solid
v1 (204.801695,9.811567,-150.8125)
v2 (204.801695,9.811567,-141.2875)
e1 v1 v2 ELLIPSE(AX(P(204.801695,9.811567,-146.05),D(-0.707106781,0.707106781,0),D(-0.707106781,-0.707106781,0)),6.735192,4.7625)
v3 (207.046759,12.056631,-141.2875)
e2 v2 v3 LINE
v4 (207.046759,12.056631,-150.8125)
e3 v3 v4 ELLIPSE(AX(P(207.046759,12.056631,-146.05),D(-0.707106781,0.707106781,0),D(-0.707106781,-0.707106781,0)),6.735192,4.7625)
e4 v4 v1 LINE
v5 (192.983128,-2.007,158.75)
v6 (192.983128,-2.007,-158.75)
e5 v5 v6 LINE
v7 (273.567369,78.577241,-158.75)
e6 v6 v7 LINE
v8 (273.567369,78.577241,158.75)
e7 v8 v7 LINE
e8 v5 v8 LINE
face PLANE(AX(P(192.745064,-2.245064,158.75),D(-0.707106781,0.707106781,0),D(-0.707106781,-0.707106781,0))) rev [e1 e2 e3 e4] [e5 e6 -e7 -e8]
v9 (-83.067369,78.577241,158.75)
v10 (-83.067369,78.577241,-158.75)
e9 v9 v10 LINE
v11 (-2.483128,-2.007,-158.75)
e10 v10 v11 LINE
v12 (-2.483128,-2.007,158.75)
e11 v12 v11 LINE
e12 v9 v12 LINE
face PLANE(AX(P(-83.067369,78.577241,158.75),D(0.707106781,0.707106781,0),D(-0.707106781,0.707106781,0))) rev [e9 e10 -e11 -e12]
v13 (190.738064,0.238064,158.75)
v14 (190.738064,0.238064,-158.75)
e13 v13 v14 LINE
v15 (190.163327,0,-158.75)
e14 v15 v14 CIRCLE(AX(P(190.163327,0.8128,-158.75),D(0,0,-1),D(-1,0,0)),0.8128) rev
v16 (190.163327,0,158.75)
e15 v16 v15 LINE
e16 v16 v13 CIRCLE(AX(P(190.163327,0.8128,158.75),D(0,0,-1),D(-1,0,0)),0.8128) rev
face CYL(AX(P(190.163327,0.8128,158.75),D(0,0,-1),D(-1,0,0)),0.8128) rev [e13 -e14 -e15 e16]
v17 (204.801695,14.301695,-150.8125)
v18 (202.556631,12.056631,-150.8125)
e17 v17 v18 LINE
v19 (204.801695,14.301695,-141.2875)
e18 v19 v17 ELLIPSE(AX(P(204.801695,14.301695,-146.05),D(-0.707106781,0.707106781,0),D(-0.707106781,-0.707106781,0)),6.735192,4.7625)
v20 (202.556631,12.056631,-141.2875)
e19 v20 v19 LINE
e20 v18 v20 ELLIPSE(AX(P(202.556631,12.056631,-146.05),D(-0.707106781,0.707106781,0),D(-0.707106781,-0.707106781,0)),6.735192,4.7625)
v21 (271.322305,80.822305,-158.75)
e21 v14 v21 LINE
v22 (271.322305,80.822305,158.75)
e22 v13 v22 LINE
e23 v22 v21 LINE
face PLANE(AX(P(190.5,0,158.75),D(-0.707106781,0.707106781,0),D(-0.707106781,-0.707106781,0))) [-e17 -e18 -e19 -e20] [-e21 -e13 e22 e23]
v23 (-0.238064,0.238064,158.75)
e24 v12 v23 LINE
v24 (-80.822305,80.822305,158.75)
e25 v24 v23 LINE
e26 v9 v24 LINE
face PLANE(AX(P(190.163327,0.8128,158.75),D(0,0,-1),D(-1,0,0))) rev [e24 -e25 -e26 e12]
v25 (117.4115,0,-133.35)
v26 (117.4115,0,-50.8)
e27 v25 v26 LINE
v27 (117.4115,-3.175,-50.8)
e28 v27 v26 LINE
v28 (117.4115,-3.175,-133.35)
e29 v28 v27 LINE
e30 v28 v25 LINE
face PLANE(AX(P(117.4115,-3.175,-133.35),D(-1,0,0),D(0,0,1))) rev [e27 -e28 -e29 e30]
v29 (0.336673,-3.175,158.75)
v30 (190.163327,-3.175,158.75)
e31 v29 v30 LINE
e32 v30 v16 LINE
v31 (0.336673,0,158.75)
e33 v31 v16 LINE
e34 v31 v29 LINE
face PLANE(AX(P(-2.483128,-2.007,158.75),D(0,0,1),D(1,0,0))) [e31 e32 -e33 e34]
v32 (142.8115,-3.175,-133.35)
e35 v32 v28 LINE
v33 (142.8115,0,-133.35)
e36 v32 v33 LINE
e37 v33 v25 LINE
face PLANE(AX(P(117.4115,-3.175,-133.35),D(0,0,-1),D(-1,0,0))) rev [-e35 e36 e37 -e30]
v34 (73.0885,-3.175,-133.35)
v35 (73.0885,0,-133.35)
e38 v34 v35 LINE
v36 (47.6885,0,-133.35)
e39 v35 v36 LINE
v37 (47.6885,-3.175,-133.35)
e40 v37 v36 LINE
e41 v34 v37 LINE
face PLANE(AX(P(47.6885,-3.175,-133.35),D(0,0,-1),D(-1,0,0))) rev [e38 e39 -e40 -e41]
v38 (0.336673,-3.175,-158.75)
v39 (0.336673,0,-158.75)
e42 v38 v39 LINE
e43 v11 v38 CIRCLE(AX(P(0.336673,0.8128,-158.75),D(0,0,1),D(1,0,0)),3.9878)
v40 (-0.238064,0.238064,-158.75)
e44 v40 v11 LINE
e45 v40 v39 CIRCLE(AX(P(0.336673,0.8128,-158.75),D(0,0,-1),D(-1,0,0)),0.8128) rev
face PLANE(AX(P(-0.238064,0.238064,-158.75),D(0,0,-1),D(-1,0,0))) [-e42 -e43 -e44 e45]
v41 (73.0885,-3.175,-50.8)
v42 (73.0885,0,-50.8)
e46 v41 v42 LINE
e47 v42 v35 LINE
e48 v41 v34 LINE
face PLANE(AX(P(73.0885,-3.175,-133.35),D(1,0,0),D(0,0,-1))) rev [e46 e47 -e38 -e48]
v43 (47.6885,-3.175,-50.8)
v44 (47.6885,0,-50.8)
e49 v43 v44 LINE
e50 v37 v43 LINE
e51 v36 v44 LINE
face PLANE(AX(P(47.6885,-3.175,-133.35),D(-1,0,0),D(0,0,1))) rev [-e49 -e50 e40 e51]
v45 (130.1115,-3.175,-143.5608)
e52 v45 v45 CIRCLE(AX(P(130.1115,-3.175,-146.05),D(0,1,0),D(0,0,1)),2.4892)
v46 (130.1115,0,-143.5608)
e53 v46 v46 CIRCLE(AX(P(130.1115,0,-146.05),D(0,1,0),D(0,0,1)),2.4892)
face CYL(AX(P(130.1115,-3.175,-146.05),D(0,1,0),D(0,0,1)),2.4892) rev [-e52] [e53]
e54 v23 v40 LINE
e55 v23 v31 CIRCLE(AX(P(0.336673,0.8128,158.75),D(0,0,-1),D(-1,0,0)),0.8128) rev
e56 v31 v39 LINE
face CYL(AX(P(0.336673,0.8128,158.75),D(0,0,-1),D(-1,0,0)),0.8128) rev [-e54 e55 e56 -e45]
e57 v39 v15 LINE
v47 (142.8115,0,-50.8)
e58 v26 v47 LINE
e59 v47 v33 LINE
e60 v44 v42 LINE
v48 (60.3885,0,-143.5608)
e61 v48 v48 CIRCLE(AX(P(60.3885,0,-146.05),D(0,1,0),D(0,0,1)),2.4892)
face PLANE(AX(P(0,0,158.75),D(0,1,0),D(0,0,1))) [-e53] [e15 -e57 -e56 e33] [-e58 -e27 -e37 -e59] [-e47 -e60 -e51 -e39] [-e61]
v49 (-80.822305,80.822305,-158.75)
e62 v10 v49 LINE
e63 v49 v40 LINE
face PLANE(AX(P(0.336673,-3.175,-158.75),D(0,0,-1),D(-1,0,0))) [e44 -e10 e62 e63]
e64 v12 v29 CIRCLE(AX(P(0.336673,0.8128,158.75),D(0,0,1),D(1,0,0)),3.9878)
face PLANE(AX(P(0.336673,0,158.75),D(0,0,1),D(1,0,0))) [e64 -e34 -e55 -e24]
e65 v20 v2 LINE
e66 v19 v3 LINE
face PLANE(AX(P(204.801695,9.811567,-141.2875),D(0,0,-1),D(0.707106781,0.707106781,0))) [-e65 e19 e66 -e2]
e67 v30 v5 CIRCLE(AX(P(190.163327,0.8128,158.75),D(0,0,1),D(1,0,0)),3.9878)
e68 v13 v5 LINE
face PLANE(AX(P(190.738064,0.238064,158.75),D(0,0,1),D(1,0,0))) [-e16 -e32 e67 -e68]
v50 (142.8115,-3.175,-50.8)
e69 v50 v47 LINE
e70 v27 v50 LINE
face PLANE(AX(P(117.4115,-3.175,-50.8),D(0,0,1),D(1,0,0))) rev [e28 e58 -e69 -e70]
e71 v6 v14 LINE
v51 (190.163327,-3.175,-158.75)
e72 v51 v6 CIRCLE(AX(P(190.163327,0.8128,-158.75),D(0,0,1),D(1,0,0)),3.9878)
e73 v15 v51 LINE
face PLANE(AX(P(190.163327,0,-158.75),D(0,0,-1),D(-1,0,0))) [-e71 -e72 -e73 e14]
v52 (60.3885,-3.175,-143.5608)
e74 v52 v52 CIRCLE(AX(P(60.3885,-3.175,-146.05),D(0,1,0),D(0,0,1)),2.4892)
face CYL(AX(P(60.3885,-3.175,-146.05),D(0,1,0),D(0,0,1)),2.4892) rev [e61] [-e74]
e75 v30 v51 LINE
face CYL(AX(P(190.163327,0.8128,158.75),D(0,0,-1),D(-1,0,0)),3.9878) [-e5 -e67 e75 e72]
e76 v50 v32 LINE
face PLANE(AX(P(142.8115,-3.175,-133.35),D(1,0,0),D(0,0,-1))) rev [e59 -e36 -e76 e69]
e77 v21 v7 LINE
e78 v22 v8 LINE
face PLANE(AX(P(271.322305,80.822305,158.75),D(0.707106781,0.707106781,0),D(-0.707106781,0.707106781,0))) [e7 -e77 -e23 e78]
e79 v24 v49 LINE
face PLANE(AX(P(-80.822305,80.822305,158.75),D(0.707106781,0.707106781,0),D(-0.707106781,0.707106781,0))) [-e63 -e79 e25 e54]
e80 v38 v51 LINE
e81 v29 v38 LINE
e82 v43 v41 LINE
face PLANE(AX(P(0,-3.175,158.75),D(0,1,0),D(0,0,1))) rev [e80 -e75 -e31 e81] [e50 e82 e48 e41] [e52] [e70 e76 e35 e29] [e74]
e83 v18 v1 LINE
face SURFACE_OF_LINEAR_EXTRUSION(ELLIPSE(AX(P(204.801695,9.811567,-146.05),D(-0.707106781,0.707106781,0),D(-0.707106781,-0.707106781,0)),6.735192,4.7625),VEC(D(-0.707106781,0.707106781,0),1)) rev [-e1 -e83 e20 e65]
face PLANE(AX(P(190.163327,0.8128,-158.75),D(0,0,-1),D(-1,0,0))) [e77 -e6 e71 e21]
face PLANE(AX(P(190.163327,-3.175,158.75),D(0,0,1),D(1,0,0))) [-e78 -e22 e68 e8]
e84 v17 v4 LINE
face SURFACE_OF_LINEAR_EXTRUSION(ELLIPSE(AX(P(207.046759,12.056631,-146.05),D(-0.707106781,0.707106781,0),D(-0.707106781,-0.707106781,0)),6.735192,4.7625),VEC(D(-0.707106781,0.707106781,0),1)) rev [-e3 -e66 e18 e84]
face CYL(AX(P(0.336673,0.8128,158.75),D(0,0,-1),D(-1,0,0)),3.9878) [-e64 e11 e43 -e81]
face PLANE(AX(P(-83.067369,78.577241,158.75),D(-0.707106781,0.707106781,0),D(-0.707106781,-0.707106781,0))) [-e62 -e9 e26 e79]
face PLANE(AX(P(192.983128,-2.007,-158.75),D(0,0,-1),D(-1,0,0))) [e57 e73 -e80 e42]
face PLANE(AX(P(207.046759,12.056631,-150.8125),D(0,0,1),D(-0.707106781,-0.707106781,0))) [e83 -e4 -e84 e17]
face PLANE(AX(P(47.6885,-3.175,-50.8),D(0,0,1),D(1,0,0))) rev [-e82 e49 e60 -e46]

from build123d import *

# Parameters (mm, degrees)
BASE_FLANGE1_DEPTH = 158.75
SKETCH8_R          = 2.4892
SKETCH8_W          = 25.4
SKETCH8_H          = 82.55
CUT_EXTRUDE1_DEPTH = 327.455070335
CUT_EXTRUDE3_START = 134.703841816
CUT_EXTRUDE3_DEPTH = 3.175


# Read off the part's stored shape, not the designer's step: Cut-Extrude3
# Sheet-metal steps are written as plain solids
with BuildPart() as part:
    # Sketch1 → Base-Flange1 (new, symmetric)
    with BuildSketch(Plane.XY):
        with BuildLine():
            Line((-80.82230509, 80.82230509), (-0.238063608, 0.238063608))
            ThreePointArc((-0.238063608, 0.238063608), (0.02562769, 0.061870716), (0.336672783, 0))
            Line((0.336672783, 0), (190.163327217, 0))
            ThreePointArc((190.163327217, 0), (190.47437231, 0.061870716), (190.738063608, 0.238063608))
            Line((190.738063608, 0.238063608), (271.32230509, 80.82230509))
            Line((271.32230509, 80.82230509), (273.56736912, 78.577241059))
            Line((273.56736912, 78.577241059), (192.983127639, -2.007000422))
            ThreePointArc((192.983127639, -2.007000422), (191.689392208, -2.8714468), (190.163327217, -3.175))
            Line((190.163327217, -3.175), (0.336672783, -3.175))
            ThreePointArc((0.336672783, -3.175), (-1.189392208, -2.8714468), (-2.483127639, -2.007000422))
            Line((-2.483127639, -2.007000422), (-83.06736912, 78.577241059))
            Line((-83.06736912, 78.577241059), (-80.82230509, 80.82230509))
        make_face()
    extrude(amount=BASE_FLANGE1_DEPTH, both=True)

    # Sketch8 → Cut-Extrude1 (cut, through all)
    with BuildSketch(Plane(origin=(0, 0, 0), x_dir=(1, 0, 0), z_dir=(0, 1, 0))):
        with Locations(Location((60.3885, 146.05, 0), (0, 0, 270))):
            Circle(SKETCH8_R)
        with Locations(Location((130.1115, 146.05, 0), (0, 0, 270))):
            Circle(SKETCH8_R)
        with Locations((60.3885, 92.075)):
            Rectangle(SKETCH8_W, SKETCH8_H)
        with Locations((130.1115, 92.075)):
            Rectangle(SKETCH8_W, SKETCH8_H)
    extrude(amount=-CUT_EXTRUDE1_DEPTH, mode=Mode.SUBTRACT)

    # Cut-Extrude3 outline → Cut-Extrude3 (cut)
    with BuildSketch(Plane(origin=(0, 0, 0), x_dir=(0.7071067811865472, 0.7071067811865479, 0), z_dir=(0.7071067811865479, -0.707106781186547, 0)).offset(CUT_EXTRUDE3_START)):
        with BuildLine():
            add(Edge.make_bspline(
                [(151.754493433, -150.8125), (145.019301342, -150.8125), (145.019301342, -146.05), (145.019301342, -141.2875), (151.754493433, -141.2875)],
                knots=[4.71238898, 4.71238898, 4.71238898, 6.283185307, 6.283185307, 7.853981634, 7.853981634, 7.853981634], degree=2, weights=[1, 0.707106781, 1, 0.707106781, 1]))
            Line((151.754493433, -150.8125), (154.929493433, -150.8125))
            add(Edge.make_bspline(
                [(154.929493433, -141.2875), (161.664685524, -141.2875), (161.664685524, -146.05), (161.664685524, -150.8125), (154.929493433, -150.8125)],
                knots=[1.570796327, 1.570796327, 1.570796327, 3.141592654, 3.141592654, 4.71238898, 4.71238898, 4.71238898], degree=2, weights=[1, 0.707106781, 1, 0.707106781, 1]))
            Line((154.929493433, -141.2875), (151.754493433, -141.2875))
        make_face()
    extrude(amount=CUT_EXTRUDE3_DEPTH, mode=Mode.SUBTRACT)


solid = part.part
